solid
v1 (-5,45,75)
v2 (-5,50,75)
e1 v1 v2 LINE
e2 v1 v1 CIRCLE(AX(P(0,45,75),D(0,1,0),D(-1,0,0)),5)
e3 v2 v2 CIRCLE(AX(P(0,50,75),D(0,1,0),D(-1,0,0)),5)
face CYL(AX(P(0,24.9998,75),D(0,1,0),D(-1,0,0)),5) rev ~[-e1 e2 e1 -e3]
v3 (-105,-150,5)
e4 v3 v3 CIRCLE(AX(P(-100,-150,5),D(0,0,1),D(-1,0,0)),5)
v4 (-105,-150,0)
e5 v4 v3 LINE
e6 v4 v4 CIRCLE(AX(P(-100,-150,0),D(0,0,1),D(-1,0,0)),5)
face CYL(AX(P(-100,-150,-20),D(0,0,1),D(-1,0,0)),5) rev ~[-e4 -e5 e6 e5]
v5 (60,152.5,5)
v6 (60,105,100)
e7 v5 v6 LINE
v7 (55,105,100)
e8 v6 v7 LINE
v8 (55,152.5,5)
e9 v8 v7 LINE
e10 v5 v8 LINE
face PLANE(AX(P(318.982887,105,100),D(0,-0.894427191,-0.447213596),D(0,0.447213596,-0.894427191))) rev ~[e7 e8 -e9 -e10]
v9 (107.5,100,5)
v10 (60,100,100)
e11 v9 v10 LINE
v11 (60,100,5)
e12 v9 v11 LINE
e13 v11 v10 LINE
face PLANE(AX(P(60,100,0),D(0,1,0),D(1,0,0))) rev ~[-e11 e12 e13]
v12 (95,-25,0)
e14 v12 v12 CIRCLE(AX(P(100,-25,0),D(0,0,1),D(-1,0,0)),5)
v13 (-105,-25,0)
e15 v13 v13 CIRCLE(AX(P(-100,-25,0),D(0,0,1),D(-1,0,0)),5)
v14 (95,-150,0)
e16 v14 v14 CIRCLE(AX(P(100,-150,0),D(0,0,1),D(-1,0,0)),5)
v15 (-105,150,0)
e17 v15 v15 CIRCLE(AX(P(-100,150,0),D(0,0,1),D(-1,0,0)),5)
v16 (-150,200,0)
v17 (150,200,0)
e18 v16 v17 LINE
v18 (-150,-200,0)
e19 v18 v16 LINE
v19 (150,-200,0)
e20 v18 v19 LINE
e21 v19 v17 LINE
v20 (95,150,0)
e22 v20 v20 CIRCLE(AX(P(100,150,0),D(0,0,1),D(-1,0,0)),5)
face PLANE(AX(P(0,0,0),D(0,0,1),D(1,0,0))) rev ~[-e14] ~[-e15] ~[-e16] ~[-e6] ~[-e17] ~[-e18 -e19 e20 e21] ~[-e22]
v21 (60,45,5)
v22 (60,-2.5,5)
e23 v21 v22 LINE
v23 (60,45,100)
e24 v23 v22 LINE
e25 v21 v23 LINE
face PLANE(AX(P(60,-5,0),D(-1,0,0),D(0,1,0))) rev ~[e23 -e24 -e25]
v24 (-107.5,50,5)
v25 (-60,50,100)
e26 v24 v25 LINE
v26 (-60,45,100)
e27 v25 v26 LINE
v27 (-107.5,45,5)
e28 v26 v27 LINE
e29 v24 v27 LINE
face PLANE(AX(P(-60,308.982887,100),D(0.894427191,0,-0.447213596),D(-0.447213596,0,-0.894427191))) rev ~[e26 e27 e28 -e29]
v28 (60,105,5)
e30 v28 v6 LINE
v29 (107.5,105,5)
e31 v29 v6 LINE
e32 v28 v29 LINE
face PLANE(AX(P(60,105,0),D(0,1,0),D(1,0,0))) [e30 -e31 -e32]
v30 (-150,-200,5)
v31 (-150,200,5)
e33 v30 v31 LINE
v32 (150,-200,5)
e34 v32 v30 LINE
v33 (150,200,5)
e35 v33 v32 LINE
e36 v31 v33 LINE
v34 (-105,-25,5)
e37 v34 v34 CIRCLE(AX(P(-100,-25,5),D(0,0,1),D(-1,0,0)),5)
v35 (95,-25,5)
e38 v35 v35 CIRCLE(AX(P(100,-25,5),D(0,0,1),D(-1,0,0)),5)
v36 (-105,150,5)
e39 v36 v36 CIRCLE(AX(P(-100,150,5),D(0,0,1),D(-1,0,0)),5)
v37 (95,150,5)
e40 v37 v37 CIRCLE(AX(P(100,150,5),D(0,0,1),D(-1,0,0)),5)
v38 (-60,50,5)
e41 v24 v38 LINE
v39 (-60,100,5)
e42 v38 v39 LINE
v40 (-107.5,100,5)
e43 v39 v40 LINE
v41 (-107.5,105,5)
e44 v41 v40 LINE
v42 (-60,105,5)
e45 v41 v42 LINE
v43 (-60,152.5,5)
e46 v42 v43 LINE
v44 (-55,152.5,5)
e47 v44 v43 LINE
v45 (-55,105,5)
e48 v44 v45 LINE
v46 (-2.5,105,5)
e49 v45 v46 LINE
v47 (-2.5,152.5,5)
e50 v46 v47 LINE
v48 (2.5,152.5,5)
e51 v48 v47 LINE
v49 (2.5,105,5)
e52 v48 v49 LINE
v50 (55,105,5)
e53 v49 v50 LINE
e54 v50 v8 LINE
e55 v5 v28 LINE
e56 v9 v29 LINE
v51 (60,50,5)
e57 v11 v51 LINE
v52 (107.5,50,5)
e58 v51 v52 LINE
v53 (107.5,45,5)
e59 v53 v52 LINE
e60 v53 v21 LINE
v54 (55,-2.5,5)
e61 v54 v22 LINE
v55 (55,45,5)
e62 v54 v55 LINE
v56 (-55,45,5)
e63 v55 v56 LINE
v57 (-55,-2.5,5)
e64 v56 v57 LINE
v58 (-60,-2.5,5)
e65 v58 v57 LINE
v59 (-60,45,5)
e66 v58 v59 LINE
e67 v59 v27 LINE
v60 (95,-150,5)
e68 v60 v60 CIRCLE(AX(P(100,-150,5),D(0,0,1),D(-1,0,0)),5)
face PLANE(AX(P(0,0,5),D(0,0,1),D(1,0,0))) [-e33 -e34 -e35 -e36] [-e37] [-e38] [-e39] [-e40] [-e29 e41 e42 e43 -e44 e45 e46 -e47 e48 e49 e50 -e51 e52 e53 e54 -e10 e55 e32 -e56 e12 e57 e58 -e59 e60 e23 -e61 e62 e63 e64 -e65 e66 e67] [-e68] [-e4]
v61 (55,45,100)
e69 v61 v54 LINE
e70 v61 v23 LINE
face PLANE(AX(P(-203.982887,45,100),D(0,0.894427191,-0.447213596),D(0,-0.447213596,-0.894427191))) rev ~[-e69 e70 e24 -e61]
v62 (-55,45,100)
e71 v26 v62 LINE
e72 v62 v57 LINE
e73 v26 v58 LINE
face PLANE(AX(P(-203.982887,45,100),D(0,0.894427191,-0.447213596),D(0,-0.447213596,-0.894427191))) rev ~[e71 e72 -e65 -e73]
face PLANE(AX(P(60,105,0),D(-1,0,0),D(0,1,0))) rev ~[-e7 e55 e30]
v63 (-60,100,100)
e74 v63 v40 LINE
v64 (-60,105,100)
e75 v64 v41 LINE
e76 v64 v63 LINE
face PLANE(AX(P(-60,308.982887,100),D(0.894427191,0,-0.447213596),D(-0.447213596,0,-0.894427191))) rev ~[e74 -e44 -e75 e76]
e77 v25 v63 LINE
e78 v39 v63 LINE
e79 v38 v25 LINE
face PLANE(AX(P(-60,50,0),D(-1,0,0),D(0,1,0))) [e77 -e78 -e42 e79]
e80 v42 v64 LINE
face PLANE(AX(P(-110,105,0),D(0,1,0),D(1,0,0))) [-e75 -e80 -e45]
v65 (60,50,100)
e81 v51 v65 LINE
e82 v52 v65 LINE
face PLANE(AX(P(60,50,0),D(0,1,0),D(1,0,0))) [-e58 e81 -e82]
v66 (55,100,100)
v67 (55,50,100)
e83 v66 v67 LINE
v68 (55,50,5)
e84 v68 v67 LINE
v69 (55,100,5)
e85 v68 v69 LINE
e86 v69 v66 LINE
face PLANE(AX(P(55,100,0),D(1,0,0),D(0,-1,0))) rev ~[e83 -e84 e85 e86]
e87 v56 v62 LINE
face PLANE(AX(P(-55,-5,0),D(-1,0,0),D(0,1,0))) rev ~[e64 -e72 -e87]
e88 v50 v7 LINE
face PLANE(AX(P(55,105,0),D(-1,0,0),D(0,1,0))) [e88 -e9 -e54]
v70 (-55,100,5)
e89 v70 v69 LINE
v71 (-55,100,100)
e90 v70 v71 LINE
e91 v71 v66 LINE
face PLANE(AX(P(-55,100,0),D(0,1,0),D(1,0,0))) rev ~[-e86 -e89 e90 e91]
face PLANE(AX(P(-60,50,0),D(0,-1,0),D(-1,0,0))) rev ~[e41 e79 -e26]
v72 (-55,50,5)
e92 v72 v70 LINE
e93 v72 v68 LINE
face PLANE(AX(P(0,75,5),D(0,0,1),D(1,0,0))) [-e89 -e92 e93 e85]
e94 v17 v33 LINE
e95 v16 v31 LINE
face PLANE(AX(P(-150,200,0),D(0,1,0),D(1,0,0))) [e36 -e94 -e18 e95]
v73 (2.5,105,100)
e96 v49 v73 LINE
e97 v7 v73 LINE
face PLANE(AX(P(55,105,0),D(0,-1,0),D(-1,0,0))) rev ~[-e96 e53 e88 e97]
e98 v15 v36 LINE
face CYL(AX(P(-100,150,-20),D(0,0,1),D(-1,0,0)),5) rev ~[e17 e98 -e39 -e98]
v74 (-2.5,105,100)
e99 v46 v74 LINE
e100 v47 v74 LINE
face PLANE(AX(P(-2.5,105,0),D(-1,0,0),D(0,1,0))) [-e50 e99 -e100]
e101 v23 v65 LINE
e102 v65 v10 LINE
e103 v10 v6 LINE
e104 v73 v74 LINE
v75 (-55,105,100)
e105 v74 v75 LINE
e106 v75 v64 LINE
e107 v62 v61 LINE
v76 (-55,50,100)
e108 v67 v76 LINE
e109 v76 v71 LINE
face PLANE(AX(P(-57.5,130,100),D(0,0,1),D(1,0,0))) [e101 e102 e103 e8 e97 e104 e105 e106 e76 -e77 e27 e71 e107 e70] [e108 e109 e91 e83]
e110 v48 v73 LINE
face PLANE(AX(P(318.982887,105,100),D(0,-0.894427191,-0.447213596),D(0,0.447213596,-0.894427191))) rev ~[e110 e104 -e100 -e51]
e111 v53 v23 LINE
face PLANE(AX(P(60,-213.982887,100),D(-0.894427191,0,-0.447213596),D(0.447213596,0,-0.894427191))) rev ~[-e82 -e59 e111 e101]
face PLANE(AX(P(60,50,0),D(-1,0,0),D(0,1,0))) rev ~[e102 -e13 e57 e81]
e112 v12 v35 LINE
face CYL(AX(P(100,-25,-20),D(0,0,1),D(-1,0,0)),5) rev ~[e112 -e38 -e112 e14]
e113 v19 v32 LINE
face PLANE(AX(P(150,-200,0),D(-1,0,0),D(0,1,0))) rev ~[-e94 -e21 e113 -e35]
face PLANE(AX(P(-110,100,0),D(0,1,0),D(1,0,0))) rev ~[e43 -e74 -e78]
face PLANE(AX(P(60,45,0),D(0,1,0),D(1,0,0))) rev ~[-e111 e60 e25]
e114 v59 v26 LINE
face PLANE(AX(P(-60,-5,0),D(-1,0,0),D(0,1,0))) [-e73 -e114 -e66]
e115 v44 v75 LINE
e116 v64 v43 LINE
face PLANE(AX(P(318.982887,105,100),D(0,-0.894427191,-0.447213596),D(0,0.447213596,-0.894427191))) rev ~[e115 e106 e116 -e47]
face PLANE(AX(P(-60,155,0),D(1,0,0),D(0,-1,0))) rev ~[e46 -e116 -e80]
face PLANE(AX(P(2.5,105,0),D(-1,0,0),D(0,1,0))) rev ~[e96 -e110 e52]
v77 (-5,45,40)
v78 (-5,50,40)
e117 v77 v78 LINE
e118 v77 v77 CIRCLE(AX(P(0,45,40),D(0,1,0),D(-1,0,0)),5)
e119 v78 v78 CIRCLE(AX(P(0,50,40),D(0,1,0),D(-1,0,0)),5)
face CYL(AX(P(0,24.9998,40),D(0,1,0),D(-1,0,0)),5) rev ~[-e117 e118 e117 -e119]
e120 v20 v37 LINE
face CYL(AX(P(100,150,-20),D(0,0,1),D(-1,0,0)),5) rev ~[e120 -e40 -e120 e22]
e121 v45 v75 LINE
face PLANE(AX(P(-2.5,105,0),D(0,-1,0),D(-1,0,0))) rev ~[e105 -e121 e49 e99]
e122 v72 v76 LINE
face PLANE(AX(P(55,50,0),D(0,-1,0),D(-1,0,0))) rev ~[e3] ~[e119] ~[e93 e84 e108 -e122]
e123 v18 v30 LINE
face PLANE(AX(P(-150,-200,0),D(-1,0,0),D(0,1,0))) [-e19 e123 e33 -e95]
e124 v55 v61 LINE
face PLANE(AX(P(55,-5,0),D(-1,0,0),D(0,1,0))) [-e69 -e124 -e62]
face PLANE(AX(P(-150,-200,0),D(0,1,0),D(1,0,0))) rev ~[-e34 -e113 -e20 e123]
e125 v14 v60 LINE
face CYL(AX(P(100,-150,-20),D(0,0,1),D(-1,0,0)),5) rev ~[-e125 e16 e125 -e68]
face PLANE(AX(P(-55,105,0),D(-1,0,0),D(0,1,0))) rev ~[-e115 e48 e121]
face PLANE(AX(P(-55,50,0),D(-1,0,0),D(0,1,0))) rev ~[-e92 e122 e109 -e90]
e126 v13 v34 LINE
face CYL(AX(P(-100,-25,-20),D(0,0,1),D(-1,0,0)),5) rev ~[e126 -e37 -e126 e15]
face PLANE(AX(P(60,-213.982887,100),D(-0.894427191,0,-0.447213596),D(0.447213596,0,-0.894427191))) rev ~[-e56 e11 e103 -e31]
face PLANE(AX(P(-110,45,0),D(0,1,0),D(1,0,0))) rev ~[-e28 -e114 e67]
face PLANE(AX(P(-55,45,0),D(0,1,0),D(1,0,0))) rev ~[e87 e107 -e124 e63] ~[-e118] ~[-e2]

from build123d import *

# Parameters (mm, degrees)
F0_W         = 5
F0_H         = 50
F0_H_2       = 5
F0_W_2       = 50
F0_W_3       = 110
F1_DEPTH     = 100
F0_W_4       = 300
F0_H_3       = 400
F2_DEPTH     = 5
F3_T4_DEPTH  = 522.9657747574
F3_T9_DEPTH  = 522.9657747574
F3_T14_DEPTH = 522.9657747574
F3_T19_DEPTH = 522.9657747574
F3_T24_DEPTH = 522.9657747574
F3_T29_DEPTH = 522.9657747574
F3_T34_DEPTH = 522.9657747574
F3_T39_DEPTH = 522.9657747574
F3_T44_DEPTH = 522.9657747574
F6_D         = 10
F6_DEPTH     = 20
F6_TIP       = 3.0043030951
F7_D         = 10
F7_DEPTH     = 20
F7_TIP       = 3.0043030951


# Not quite as in the source:
# - a fillet or chamfer that OpenCascade refuses, or shapes differently, is made with other operations: its cross-section is extruded or revolved along the edge and cut away or added


with BuildPart() as f1:
    # F0 (on Top) → F1 (new body)
    with BuildSketch(Plane.XY):
        with Locations((-57.5, 130)):
            Rectangle(F0_W, F0_H)
        with Locations((-57.5, 20)):
            Rectangle(F0_W, F0_H)
        with Locations((-57.5, 102.5)):
            Rectangle(F0_W, F0_H_2)
        with Locations((57.5, 102.5)):
            Rectangle(F0_W, F0_H_2)
        with Locations((-85, 47.5)):
            Rectangle(F0_W_2, F0_H_2)
        with Locations((-85, 102.5)):
            Rectangle(F0_W_2, F0_H_2)
        Polygon((-55, 105), (-55, 100), (55, 100), (55, 105), (2.5, 105), (-2.5, 105), align=None)
        with Locations((57.5, 47.5)):
            Rectangle(F0_W, F0_H_2)
        with Locations((57.5, 75)):
            Rectangle(F0_W, F0_H)
        with Locations((0, 47.5)):
            Rectangle(F0_W_3, F0_H_2)
        with Locations((57.5, 130)):
            Rectangle(F0_W, F0_H)
        with Locations((85, 102.5)):
            Rectangle(F0_W_2, F0_H_2)
        with Locations((-57.5, 47.5)):
            Rectangle(F0_W, F0_H_2)
        with Locations((85, 47.5)):
            Rectangle(F0_W_2, F0_H_2)
        with Locations((-57.5, 75)):
            Rectangle(F0_W, F0_H)
        with Locations((57.5, 20)):
            Rectangle(F0_W, F0_H)
        with Locations((0, 130)):
            Rectangle(F0_W, F0_H)
    extrude(amount=F1_DEPTH)

    # F0 (on Top) → F2 (join)
    with BuildSketch(Plane.XY):
        Rectangle(F0_W_4, F0_H_3)
        Polygon((55, 45), (-55, 45), (-55, -5), (-60, -5), (-60, 45), (-110, 45), (-110, 50), (-60, 50), (-60, 100), (-110, 100), (-110, 105), (-60, 105), (-60, 155), (-55, 155), (-55, 105), (-2.5, 105), (-2.5, 155), (2.5, 155), (2.5, 105), (55, 105), (55, 155), (60, 155), (60, 105), (110, 105), (110, 100), (60, 100), (60, 50), (110, 50), (110, 45), (60, 45), (60, -5), (55, -5), align=None, mode=Mode.SUBTRACT)
        with Locations((0, 75)):
            Rectangle(F0_W_3, F0_H)
    extrude(amount=F2_DEPTH)

    # F3: chamfer of 50 x 100 on 9 edges, made by hand


with BuildPart() as f3_tool2:
    # F3_s3 → F3_t4 (new body)
    with BuildSketch(Plane.XZ.offset(213.9828873787)):
        Polygon((60, 100), (110, 0), (110, 100), align=None)
    extrude(amount=-F3_T4_DEPTH)

    split(bisect_by=Plane.XY.offset(5), keep=Keep.TOP)


with BuildPart() as f1_1:
    add(f1.part)

    # F3_t1: cut F3_tool2
    add(f3_tool2.part, mode=Mode.SUBTRACT)


with BuildPart() as f3_tool7:
    # F3_s8 → F3_t9 (new body)
    with BuildSketch(Plane.XZ.offset(158.9828873787)):
        Polygon((60, 100), (110, 0), (110, 100), align=None)
    extrude(amount=-F3_T9_DEPTH)

    split(bisect_by=Plane.XY.offset(5), keep=Keep.TOP)


with BuildPart() as f1_2:
    add(f1_1.part)

    # F3_t6: cut F3_tool7
    add(f3_tool7.part, mode=Mode.SUBTRACT)


with BuildPart() as f3_tool12:
    # F3_s13 → F3_t14 (new body)
    with BuildSketch(Plane.YZ.offset(-203.9828873787)):
        Polygon((45, 100), (-5, 0), (-5, 100), align=None)
    extrude(amount=F3_T14_DEPTH)

    split(bisect_by=Plane.XY.offset(5), keep=Keep.TOP)


with BuildPart() as f1_3:
    add(f1_2.part)

    # F3_t11: cut F3_tool12
    add(f3_tool12.part, mode=Mode.SUBTRACT)


with BuildPart() as f3_tool17:
    # F3_s18 → F3_t19 (new body)
    with BuildSketch(Plane.YZ.offset(318.9828873787)):
        Polygon((105, 100), (155, 0), (155, 100), align=None)
    extrude(amount=-F3_T19_DEPTH)

    split(bisect_by=Plane.XY.offset(5), keep=Keep.TOP)


with BuildPart() as f1_4:
    add(f1_3.part)

    # F3_t16: cut F3_tool17
    add(f3_tool17.part, mode=Mode.SUBTRACT)


with BuildPart() as f3_tool22:
    # F3_s23 → F3_t24 (new body)
    with BuildSketch(Plane.YZ.offset(-318.9828873787)):
        Polygon((45, 100), (-5, 0), (-5, 100), align=None)
    extrude(amount=F3_T24_DEPTH)

    split(bisect_by=Plane.XY.offset(5), keep=Keep.TOP)


with BuildPart() as f1_5:
    add(f1_4.part)

    # F3_t21: cut F3_tool22
    add(f3_tool22.part, mode=Mode.SUBTRACT)


with BuildPart() as f3_tool27:
    # F3_s28 → F3_t29 (new body)
    with BuildSketch(Plane.XZ.offset(-308.9828873787)):
        Polygon((-60, 100), (-110, 0), (-110, 100), align=None)
    extrude(amount=F3_T29_DEPTH)

    split(bisect_by=Plane.XY.offset(5), keep=Keep.TOP)


with BuildPart() as f1_6:
    add(f1_5.part)

    # F3_t26: cut F3_tool27
    add(f3_tool27.part, mode=Mode.SUBTRACT)


with BuildPart() as f3_tool32:
    # F3_s33 → F3_t34 (new body)
    with BuildSketch(Plane.XZ.offset(-363.9828873787)):
        Polygon((-60, 100), (-110, 0), (-110, 100), align=None)
    extrude(amount=F3_T34_DEPTH)

    split(bisect_by=Plane.XY.offset(5), keep=Keep.TOP)


with BuildPart() as f1_7:
    add(f1_6.part)

    # F3_t31: cut F3_tool32
    add(f3_tool32.part, mode=Mode.SUBTRACT)


with BuildPart() as f3_tool37:
    # F3_s38 → F3_t39 (new body)
    with BuildSketch(Plane.YZ.offset(203.9828873787)):
        Polygon((155, 0), (105, 100), (155, 100), align=None)
    extrude(amount=-F3_T39_DEPTH)

    split(bisect_by=Plane.XY.offset(5), keep=Keep.TOP)


with BuildPart() as f1_8:
    add(f1_7.part)

    # F3_t36: cut F3_tool37
    add(f3_tool37.part, mode=Mode.SUBTRACT)


with BuildPart() as f3_tool42:
    # F3_s43 → F3_t44 (new body)
    with BuildSketch(Plane.YZ.offset(261.4828873787)):
        Polygon((105, 100), (155, 0), (155, 100), align=None)
    extrude(amount=-F3_T44_DEPTH)

    split(bisect_by=Plane.XY.offset(5), keep=Keep.TOP)


with BuildPart() as f1_9:
    add(f1_8.part)

    # F3_t41: cut F3_tool42
    add(f3_tool42.part, mode=Mode.SUBTRACT)

    # F6
    with Locations(Plane.XZ.offset(-44.9998)):
        with Locations((0, 40), (0, 75)):
            Hole(F6_D / 2, depth=F6_DEPTH)
            with Locations((0, 0, -(F6_DEPTH + F6_TIP / 2))):  # 118° drill point
                Cone(0, F6_D / 2, F6_TIP, mode=Mode.SUBTRACT)

    # F7
    with Locations(Plane(origin=(0, 0, 0), x_dir=(1, 0, 0), z_dir=(0, 0, -1))):
        with Locations((-100, 25), (-100, -150), (100, -150), (100, 25), (100, 150), (-100, 150)):
            Hole(F7_D / 2, depth=F7_DEPTH)
            with Locations((0, 0, -(F7_DEPTH + F7_TIP / 2))):  # 118° drill point
                Cone(0, F7_D / 2, F7_TIP, mode=Mode.SUBTRACT)


solid = f1_9.part
